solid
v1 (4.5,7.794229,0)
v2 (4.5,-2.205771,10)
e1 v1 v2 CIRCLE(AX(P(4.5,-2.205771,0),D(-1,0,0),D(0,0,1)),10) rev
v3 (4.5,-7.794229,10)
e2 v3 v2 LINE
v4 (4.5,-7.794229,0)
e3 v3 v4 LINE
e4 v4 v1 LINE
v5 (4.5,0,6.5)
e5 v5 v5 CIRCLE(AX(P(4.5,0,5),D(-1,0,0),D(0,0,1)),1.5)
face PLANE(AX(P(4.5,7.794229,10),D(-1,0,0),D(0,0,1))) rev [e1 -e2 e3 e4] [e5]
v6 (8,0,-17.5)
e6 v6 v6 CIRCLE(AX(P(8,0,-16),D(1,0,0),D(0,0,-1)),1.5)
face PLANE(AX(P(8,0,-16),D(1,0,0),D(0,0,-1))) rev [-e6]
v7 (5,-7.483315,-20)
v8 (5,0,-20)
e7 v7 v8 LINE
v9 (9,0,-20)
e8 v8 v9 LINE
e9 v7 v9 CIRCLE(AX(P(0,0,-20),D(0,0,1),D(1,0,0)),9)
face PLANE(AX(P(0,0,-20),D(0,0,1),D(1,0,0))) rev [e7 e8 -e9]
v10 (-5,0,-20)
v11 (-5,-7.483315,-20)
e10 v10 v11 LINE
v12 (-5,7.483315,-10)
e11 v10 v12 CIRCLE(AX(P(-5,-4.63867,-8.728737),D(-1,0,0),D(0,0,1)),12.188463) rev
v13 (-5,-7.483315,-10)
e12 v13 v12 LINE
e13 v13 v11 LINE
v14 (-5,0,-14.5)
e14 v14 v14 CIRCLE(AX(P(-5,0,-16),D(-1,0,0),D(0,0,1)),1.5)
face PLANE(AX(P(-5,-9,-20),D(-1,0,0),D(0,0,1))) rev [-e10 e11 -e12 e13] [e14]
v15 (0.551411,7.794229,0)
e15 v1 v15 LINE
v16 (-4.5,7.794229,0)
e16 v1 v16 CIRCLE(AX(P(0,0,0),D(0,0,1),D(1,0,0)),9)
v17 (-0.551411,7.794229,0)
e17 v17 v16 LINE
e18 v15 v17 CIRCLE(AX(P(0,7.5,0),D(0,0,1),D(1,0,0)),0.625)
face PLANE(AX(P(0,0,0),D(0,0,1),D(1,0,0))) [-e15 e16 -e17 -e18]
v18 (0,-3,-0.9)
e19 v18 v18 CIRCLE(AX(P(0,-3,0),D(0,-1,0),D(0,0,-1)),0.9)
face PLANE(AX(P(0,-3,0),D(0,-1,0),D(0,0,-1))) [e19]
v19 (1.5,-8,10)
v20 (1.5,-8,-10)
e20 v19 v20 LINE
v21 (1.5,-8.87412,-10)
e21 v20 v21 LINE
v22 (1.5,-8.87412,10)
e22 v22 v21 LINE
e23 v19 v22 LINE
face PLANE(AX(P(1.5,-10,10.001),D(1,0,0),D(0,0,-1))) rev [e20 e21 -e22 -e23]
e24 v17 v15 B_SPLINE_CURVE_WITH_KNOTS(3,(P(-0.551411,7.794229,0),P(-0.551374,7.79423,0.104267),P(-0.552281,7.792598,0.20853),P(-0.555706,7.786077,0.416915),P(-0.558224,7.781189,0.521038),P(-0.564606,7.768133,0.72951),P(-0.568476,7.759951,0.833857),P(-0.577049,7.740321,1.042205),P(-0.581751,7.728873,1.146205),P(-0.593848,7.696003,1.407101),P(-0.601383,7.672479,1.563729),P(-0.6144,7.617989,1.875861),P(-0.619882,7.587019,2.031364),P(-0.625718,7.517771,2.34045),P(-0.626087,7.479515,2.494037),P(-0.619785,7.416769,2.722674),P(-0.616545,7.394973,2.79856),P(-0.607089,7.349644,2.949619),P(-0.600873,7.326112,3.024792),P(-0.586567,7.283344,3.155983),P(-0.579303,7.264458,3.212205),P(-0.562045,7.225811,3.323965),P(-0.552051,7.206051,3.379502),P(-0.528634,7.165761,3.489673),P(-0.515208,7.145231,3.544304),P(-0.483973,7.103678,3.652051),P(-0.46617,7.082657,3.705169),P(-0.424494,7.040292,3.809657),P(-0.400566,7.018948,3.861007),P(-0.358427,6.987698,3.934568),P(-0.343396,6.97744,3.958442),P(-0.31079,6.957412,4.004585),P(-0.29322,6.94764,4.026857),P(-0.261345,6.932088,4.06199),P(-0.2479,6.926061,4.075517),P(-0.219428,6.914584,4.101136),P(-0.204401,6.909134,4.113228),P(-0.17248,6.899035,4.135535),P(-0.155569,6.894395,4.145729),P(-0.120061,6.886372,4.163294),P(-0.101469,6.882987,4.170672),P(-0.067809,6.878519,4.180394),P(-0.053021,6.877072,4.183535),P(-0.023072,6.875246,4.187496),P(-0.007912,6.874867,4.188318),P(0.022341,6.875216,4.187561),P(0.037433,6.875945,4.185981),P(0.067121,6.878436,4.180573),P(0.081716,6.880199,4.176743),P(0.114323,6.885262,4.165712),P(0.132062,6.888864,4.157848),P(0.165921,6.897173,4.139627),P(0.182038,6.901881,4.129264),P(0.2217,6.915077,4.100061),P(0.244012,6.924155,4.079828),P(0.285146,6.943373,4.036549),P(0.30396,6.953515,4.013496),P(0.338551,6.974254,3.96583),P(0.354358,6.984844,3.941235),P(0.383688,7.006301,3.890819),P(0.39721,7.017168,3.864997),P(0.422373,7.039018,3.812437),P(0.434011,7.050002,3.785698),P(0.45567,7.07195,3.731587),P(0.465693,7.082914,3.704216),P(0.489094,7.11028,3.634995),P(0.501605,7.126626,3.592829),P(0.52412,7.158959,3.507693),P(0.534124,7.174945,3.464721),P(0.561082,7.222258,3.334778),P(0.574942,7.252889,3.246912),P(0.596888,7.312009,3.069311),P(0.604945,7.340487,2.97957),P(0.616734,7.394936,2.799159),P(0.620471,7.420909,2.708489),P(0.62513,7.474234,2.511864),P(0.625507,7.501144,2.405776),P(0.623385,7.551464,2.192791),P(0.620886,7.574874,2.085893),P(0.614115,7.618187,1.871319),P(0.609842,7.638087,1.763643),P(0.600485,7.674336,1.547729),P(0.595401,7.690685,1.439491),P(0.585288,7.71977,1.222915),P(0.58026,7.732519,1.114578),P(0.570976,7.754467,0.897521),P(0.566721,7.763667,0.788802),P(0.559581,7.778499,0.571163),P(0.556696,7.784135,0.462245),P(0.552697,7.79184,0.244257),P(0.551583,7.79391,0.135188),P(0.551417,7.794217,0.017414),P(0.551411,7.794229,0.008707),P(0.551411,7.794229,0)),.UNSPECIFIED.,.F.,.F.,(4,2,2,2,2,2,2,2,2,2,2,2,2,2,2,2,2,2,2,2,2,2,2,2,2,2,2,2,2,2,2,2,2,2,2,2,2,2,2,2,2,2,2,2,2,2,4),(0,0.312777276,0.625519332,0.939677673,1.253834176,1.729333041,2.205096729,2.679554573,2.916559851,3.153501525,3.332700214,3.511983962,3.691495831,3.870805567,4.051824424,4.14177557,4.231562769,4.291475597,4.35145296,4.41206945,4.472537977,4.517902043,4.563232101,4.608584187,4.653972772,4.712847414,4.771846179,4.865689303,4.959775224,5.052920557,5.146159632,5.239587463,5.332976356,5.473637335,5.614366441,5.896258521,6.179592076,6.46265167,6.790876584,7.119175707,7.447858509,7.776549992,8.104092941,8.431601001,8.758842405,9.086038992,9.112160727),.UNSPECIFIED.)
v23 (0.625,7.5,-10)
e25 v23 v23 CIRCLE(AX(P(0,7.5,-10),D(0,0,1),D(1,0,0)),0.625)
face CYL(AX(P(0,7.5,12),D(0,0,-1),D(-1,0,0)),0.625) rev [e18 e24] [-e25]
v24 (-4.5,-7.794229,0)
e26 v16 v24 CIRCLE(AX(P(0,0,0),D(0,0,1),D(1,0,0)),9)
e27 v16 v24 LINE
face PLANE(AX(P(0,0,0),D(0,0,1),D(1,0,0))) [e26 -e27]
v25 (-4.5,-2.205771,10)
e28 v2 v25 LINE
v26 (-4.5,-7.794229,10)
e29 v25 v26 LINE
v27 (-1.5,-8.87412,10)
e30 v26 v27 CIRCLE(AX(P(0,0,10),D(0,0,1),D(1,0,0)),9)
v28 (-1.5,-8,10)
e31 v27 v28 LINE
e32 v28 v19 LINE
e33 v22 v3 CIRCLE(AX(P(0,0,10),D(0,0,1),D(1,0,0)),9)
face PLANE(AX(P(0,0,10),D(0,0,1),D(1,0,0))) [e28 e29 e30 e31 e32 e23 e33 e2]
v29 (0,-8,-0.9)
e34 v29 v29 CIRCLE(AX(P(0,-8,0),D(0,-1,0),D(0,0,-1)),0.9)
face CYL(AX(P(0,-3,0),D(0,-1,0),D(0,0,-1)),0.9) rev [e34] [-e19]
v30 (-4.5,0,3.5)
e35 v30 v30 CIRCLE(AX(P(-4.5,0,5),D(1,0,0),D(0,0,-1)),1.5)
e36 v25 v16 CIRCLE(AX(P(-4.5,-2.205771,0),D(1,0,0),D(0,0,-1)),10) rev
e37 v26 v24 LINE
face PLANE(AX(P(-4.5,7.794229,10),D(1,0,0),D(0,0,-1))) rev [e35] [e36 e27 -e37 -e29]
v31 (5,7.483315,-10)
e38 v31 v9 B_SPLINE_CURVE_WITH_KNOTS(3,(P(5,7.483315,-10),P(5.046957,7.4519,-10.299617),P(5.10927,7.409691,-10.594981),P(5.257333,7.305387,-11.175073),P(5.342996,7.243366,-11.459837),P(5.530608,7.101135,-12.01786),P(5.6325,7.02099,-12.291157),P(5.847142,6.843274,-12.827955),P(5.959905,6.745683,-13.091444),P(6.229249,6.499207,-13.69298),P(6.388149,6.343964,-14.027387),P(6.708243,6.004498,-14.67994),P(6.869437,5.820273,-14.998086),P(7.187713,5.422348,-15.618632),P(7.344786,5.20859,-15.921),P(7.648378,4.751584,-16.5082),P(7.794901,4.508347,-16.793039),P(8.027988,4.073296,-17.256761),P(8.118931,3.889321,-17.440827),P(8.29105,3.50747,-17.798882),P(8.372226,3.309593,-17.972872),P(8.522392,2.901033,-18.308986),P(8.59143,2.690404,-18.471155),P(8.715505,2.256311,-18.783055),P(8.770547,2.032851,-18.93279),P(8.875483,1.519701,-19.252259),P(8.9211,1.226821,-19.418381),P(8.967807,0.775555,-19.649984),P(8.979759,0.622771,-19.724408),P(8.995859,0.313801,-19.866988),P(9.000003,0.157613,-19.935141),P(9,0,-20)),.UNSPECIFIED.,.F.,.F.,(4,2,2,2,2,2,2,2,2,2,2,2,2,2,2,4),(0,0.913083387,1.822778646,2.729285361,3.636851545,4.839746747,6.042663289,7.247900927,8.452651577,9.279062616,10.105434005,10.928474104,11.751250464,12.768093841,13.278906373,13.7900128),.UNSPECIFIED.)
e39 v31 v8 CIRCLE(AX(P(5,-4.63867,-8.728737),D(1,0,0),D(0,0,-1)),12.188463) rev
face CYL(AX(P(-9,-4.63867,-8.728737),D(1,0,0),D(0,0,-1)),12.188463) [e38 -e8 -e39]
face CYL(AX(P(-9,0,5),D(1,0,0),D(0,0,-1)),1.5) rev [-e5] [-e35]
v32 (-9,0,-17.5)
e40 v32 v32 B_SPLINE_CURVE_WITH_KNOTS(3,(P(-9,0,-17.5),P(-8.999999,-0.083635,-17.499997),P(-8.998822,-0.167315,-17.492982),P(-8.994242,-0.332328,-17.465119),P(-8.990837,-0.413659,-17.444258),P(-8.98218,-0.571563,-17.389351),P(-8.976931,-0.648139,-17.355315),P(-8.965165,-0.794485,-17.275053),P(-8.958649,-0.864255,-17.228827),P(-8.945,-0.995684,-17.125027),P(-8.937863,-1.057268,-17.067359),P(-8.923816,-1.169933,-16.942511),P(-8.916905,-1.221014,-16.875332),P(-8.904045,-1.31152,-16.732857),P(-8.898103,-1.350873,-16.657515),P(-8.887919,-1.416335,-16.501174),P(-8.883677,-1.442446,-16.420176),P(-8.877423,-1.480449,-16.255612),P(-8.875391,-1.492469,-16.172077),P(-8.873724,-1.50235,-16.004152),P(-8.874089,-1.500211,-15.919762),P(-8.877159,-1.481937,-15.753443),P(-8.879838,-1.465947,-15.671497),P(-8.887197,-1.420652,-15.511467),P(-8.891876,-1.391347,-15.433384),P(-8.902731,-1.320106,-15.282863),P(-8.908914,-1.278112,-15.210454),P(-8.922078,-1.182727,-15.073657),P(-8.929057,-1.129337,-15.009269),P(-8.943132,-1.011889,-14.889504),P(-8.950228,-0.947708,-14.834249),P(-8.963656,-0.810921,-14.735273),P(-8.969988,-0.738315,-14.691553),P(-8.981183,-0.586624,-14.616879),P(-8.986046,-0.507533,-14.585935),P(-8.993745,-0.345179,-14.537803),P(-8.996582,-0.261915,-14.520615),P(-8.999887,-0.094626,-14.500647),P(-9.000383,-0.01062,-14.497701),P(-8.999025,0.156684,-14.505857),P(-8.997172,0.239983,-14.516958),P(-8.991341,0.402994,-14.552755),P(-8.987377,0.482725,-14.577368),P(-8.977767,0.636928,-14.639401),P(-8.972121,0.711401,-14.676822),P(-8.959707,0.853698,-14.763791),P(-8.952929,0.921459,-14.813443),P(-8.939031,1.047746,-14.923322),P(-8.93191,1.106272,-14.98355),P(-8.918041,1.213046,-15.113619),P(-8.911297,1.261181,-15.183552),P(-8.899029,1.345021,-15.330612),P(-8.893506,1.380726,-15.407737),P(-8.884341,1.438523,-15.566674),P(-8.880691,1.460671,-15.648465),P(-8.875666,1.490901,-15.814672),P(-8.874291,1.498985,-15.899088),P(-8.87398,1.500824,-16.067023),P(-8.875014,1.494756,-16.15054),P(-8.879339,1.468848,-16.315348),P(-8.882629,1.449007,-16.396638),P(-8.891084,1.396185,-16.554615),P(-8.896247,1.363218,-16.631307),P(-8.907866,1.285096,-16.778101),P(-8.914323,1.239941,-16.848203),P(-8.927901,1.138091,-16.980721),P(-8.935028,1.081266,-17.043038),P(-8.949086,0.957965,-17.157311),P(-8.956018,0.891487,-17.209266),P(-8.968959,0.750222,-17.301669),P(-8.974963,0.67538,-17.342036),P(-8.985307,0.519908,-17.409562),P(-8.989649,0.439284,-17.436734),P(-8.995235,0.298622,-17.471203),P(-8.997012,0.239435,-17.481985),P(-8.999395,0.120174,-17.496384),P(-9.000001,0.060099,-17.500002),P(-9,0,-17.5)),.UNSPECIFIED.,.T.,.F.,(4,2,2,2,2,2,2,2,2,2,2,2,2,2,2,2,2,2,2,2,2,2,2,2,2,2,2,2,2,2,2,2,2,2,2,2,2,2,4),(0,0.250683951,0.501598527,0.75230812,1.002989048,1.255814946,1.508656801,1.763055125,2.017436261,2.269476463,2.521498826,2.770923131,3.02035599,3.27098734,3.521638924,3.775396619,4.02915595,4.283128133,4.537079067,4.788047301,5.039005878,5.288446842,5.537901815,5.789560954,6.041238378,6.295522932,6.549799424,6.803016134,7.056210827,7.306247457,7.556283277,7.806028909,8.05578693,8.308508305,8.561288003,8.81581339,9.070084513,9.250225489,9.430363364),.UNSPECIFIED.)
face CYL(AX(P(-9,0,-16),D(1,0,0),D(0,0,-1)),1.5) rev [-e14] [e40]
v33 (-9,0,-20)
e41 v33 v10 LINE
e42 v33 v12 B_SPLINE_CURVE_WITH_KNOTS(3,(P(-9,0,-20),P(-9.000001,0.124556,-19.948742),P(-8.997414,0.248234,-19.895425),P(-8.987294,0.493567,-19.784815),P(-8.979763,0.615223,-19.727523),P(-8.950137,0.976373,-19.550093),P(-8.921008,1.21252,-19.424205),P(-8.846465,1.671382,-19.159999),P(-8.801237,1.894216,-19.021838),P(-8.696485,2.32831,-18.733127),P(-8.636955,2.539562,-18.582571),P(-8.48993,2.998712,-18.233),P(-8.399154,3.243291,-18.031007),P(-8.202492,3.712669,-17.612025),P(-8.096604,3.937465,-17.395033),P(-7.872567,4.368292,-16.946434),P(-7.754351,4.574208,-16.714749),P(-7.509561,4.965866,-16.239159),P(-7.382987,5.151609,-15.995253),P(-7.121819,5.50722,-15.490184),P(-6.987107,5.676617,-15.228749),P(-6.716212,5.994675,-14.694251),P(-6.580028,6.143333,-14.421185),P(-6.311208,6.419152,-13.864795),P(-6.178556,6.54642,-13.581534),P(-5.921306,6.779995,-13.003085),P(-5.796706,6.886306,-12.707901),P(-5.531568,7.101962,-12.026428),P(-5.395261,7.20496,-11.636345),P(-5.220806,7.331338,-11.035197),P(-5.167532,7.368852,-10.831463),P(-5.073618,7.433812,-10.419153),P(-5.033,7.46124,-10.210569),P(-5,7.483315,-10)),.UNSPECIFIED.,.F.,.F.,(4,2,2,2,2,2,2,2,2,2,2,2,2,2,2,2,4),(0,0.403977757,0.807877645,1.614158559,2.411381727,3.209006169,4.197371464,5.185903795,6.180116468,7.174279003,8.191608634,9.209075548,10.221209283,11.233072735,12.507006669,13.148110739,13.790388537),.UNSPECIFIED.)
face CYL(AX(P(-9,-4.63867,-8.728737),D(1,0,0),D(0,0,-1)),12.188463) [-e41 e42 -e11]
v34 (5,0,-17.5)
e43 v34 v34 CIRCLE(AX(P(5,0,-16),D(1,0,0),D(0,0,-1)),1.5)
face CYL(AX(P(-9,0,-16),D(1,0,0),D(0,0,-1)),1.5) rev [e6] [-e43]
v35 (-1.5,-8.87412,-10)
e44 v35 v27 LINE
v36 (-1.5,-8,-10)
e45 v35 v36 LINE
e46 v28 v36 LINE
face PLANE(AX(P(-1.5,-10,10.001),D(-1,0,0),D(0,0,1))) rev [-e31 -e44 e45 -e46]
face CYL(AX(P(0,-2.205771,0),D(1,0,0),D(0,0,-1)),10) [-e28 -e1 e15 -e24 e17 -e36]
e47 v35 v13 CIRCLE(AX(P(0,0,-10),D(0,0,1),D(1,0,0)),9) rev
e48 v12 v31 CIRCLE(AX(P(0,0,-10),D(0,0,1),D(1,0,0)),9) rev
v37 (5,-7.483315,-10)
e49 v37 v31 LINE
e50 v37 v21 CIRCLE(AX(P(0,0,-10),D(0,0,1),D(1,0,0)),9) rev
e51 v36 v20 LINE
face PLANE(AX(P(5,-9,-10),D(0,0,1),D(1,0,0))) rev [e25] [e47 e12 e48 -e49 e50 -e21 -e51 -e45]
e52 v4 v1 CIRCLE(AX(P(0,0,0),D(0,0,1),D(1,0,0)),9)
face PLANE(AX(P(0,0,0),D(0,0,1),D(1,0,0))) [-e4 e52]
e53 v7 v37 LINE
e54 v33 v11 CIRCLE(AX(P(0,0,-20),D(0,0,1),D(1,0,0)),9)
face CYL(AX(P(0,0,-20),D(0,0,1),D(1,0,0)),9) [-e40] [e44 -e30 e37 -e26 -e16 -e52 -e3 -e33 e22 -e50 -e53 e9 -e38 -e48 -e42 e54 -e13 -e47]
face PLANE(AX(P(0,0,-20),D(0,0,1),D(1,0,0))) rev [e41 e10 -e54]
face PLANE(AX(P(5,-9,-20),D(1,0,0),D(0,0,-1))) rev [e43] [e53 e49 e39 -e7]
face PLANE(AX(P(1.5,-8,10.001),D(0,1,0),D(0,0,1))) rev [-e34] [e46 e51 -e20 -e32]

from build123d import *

# Parameters (mm, degrees)
SKETCH1_R               = 9
BOSS_EXTRUDE1_DEPTH     = 20
CUT_EXTRUDE1_DEPTH      = 24.706539182
CUT_EXTRUDE1_DEPTH_BACK = 24.706539182
SKETCH2_W               = 10
SKETCH2_H               = 10
BOSS_EXTRUDE2_START     = 10
BOSS_EXTRUDE2_DEPTH     = 10
CUT_EXTRUDE2_DEPTH      = 8
CUT_EXTRUDE2_DEPTH_BACK = 24.706539182
SKETCH4_R               = 1.5
FILLET1_R               = 10
CUT_EXTRUDE3_DEPTH      = 24.706539343
CUT_EXTRUDE3_DEPTH_BACK = 24.706539343
SKETCH6_R               = 0.625
CUT_EXTRUDE4_DEPTH      = 32
CUT_EXTRUDE5_REACH      = 25.707
SKETCH7_W               = 3
SKETCH7_H               = 2
SKETCH8_R               = 0.9
CUT_EXTRUDE6_DEPTH      = 5


with BuildPart() as part:
    # Sketch1 → Boss-Extrude1 (new body)
    with BuildSketch(Plane.XY):
        Circle(SKETCH1_R)
    extrude(amount=-BOSS_EXTRUDE1_DEPTH)

    # Sketch2 → Cut-Extrude1 (cut, two sides: drawn at the far end of the back side and taken through both)
    with BuildSketch(Plane(origin=(0, 0, 0), x_dir=(1, 0, 0), z_dir=(0, 1, 0)).offset(-CUT_EXTRUDE1_DEPTH_BACK)):
        with Locations((0, 15)):
            Rectangle(SKETCH2_W, SKETCH2_H)
    extrude(amount=CUT_EXTRUDE1_DEPTH + CUT_EXTRUDE1_DEPTH_BACK, mode=Mode.SUBTRACT)

    # Sketch3 → Boss-Extrude2 (add)
    with BuildSketch(Plane.XY.offset(BOSS_EXTRUDE2_START)):
        with BuildLine():
            Line((-4.5, 7.794228634), (-4.5, -7.794228634))
            ThreePointArc((-4.5, -7.794228634), (0, -9), (4.5, -7.794228634))
            Line((4.5, -7.794228634), (4.5, 7.794228634))
            Line((4.5, 7.794228634), (-4.5, 7.794228634))
        make_face()
    extrude(amount=-BOSS_EXTRUDE2_DEPTH)

    # Sketch4 → Cut-Extrude2 (cut, two sides: drawn at the far end of the back side and taken through both)
    with BuildSketch(Plane(origin=(0, 0, 0), x_dir=(0, 0, -1), z_dir=(1, 0, 0)).offset(-CUT_EXTRUDE2_DEPTH_BACK)):
        with Locations((-5, 0)):
            Circle(SKETCH4_R)
        with Locations((16, 0)):
            Circle(SKETCH4_R)
    extrude(amount=CUT_EXTRUDE2_DEPTH + CUT_EXTRUDE2_DEPTH_BACK, mode=Mode.SUBTRACT)

    # Fillet1
    fillet1_edges = [part.edges().sort_by_distance(p)[0] for p in [
        (0, 7.794228634, 10),
    ]]
    fillet(fillet1_edges, radius=FILLET1_R - 0.0001)  # a hair under: the kernel refuses the full size

    # Sketch5 → Cut-Extrude3 (cut, two sides: drawn at the far end of the back side and taken through both)
    with BuildSketch(Plane(origin=(0, 0, 0), x_dir=(0, 0, -1), z_dir=(1, 0, 0)).offset(-CUT_EXTRUDE3_DEPTH_BACK)):
        with BuildLine():
            Line((10, 7.483314774), (20, 7.483314774))
            Line((20, 7.483314774), (20, 0))
            ThreePointArc((20, 0), (16.031389946, 5.119910176), (10, 7.483314774))
        make_face()
    extrude(amount=CUT_EXTRUDE3_DEPTH + CUT_EXTRUDE3_DEPTH_BACK, mode=Mode.SUBTRACT)

    # Sketch6 → Cut-Extrude4 (cut)
    with BuildSketch(Plane(origin=(0, 0, -20), x_dir=(-1, 0, 0), z_dir=(0, 0, -1))):
        with Locations(Location((0, 7.5, 0), (0, 0, 28.084018699))):
            Circle(SKETCH6_R)
    extrude(amount=-CUT_EXTRUDE4_DEPTH, mode=Mode.SUBTRACT)

    # Sketch7 → Cut-Extrude5 (cut, up to next)
    with BuildSketch(Plane(origin=(0, 0, -10), x_dir=(-1, 0, 0), z_dir=(0, 0, -1)), mode=Mode.PRIVATE) as cut_extrude5_sk1:
        with Locations((0, -9)):
            Rectangle(SKETCH7_W, SKETCH7_H)
    cut_extrude5_tool1 = extrude(cut_extrude5_sk1.sketch, amount=-CUT_EXTRUDE5_REACH, mode=Mode.PRIVATE) & part.part
    add(cut_extrude5_tool1.solids().sort_by_distance((0, -9, -10))[0], mode=Mode.SUBTRACT)

    # Sketch8 → Cut-Extrude6 (cut)
    with BuildSketch(Plane(origin=(0, -8, 0), x_dir=(-1, 0, 0), z_dir=(0, -1, 0))):
        with Locations(Location((0, 0, 0), (0, 0, 90))):
            Circle(SKETCH8_R)
    extrude(amount=-CUT_EXTRUDE6_DEPTH, mode=Mode.SUBTRACT)


solid = part.part
